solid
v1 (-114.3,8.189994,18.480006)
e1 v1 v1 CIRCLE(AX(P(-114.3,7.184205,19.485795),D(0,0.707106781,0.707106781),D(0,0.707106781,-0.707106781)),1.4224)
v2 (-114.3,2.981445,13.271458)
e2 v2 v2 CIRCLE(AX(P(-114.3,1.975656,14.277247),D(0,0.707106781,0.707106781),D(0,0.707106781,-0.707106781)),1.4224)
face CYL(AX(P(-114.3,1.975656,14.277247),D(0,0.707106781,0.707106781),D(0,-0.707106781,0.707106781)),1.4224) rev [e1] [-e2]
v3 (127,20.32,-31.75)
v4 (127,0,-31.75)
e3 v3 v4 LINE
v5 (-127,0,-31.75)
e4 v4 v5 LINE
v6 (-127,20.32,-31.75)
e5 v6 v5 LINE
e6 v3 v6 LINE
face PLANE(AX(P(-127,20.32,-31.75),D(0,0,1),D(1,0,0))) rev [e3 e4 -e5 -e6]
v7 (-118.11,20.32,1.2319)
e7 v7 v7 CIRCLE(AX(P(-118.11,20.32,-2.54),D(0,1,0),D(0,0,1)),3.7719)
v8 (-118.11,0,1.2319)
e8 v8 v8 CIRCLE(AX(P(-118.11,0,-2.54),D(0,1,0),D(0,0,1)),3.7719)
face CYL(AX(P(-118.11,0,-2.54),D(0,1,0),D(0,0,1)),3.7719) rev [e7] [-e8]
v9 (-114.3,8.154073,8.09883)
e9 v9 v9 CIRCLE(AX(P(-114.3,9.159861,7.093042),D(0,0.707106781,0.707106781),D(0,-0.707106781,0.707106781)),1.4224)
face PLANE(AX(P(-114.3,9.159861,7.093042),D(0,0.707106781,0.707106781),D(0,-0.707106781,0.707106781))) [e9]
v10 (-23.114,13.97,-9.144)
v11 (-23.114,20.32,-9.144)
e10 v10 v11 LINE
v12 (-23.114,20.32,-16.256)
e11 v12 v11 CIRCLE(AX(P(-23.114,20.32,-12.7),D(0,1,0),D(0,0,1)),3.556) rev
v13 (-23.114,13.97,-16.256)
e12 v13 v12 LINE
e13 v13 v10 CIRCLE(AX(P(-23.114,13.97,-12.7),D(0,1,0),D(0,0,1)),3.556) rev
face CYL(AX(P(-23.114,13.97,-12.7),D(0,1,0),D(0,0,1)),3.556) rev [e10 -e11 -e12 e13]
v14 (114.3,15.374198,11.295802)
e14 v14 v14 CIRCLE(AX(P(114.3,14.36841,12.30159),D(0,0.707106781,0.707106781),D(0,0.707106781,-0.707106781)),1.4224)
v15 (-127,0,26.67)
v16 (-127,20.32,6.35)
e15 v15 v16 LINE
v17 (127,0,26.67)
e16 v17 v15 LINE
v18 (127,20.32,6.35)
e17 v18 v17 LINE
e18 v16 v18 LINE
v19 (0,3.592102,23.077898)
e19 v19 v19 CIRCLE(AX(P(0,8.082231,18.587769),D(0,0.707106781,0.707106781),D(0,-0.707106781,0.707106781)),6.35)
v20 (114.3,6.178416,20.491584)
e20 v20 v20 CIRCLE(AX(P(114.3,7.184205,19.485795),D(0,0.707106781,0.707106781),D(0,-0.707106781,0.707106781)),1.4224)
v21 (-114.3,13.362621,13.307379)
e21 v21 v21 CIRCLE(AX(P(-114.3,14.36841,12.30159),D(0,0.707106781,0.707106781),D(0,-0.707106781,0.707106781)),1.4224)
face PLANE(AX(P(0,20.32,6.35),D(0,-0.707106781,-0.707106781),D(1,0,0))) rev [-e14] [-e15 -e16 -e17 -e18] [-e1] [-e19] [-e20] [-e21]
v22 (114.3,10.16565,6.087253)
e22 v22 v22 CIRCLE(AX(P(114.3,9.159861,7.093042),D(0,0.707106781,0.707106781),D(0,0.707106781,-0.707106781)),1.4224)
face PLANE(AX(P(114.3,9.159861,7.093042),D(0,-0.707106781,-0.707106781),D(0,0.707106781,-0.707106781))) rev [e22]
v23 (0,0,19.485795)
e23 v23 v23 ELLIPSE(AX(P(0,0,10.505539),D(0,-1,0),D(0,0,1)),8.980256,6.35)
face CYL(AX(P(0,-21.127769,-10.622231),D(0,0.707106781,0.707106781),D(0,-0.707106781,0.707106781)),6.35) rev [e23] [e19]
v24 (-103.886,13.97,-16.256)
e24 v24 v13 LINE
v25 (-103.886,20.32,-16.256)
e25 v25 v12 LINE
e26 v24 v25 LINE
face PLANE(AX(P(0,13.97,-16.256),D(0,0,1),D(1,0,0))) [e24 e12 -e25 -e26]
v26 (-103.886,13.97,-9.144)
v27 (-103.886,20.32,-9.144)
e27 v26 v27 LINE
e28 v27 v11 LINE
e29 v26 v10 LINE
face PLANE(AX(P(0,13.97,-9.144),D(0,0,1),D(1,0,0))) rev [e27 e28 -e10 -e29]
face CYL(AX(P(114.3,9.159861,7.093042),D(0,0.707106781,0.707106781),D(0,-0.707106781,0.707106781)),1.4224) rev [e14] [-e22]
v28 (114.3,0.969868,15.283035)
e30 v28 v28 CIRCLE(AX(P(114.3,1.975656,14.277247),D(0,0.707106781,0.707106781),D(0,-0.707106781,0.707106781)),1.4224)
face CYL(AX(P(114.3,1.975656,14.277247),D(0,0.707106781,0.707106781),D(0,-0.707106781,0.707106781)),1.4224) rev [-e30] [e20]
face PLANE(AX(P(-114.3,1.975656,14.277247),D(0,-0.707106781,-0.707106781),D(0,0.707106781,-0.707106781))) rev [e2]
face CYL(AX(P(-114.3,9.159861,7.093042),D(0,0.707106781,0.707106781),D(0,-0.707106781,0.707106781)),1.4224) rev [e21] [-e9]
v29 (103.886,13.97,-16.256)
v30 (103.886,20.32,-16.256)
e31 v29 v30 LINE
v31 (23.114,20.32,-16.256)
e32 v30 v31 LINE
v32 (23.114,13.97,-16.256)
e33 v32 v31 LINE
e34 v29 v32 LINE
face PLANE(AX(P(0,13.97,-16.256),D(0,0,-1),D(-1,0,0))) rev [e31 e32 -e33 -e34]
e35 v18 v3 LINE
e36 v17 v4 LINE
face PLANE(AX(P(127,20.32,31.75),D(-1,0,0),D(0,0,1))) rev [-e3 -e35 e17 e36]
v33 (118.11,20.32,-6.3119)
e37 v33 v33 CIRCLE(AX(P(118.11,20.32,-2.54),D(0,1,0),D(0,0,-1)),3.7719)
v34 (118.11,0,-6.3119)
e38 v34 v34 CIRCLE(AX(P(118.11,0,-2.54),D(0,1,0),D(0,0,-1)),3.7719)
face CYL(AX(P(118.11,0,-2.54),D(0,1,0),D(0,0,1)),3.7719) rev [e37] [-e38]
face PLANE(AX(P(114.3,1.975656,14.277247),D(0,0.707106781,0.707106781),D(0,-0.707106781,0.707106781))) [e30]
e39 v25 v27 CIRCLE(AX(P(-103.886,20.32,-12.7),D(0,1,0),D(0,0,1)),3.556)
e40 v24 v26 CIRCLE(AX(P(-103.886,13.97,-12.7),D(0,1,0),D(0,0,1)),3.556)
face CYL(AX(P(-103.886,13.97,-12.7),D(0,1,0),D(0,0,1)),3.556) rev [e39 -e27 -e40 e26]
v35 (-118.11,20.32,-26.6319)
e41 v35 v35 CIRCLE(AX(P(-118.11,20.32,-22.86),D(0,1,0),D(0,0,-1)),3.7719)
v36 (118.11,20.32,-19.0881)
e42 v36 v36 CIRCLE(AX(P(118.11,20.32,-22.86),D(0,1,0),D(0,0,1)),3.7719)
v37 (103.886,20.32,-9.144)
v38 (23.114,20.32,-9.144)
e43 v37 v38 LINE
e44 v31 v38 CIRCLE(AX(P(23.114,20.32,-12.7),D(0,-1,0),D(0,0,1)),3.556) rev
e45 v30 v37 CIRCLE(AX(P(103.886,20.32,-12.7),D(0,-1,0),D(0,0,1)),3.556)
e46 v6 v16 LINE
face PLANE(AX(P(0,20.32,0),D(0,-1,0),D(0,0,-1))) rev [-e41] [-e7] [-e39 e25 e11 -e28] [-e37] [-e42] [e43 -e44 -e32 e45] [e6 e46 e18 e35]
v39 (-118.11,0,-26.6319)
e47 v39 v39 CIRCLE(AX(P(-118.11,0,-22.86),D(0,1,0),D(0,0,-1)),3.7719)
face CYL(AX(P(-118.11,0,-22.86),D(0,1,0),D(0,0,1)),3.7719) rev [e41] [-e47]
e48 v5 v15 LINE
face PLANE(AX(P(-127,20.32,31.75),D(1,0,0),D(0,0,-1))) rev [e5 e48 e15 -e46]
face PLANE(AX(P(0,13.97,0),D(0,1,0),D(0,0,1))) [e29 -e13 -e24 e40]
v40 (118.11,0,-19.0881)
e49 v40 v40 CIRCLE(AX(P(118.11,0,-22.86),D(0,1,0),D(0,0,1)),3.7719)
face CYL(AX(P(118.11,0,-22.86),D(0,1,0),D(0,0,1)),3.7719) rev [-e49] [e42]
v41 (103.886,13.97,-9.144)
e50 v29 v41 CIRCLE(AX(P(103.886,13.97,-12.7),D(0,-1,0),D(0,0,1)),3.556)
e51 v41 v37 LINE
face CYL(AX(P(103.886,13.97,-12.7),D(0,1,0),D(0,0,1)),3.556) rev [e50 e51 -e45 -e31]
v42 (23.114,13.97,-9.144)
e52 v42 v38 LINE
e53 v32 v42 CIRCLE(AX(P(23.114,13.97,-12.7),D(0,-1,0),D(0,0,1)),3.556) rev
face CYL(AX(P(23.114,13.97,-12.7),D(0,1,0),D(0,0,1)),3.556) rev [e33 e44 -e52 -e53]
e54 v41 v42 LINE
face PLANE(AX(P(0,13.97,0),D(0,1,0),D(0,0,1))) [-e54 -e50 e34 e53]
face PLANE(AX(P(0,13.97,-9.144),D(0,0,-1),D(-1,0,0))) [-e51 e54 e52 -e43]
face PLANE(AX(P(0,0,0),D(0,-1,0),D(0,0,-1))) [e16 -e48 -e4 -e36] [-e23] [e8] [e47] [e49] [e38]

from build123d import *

# Parameters (mm, degrees)
SKETCH1_W           = 254
SKETCH1_H           = 63.5
BOSS_EXTRUDE1_DEPTH = 20.32
CHAMFER1_SIZE       = 25.4
CUT_EXTRUDE1_DEPTH  = 6.35
SKETCH3_R           = 3.7719
CUT_EXTRUDE2_DEPTH  = 133.476280518
SKETCH4_R           = 1.4224
CUT_EXTRUDE3_DEPTH  = 7.366
SKETCH5_R           = 6.35
CUT_EXTRUDE4_DEPTH  = 136.423334215


with BuildPart() as part:
    # Sketch1 → Boss-Extrude1 (new body)
    with BuildSketch(Plane(origin=(0, 0, 0), x_dir=(1, 0, 0), z_dir=(0, 1, 0))):
        Rectangle(SKETCH1_W, SKETCH1_H)
    extrude(amount=BOSS_EXTRUDE1_DEPTH)

    # Chamfer1
    # the kernel refuses this chamfer: 25.4 mm, written as the material it takes off along each edge
    with BuildSketch(Plane(origin=(-192.320747894, 20.32, 31.75), x_dir=(0, -0.9996219169112966, 0.02749587661058647), z_dir=(1, 0, 0))) as chamfer1_piece_1:
        Polygon((CHAMFER1_SIZE * 0.999621916911, CHAMFER1_SIZE * 0.0274958766106), (-CHAMFER1_SIZE * 0.0274958766106, CHAMFER1_SIZE * 0.999621916911), (0, 0), align=None)
    extrude(amount=384.641495789, mode=Mode.SUBTRACT)

    # Sketch2 → Cut-Extrude1 (cut)
    with BuildSketch(Plane(origin=(0, 20.32, 0), x_dir=(1, 0, 0), z_dir=(0, 1, 0))):
        with BuildLine():
            ThreePointArc((-107.442, 12.7), (-106.400471714, 10.185528286), (-103.886, 9.144))
            Line((-103.886, 9.144), (-23.114, 9.144))
            ThreePointArc((-23.114, 9.144), (-20.599528286, 10.185528286), (-19.558, 12.7))
            ThreePointArc((-19.558, 12.7), (-20.599528286, 15.214471714), (-23.114, 16.256))
            Line((-23.114, 16.256), (-103.886, 16.256))
            ThreePointArc((-103.886, 16.256), (-106.400471714, 15.214471714), (-107.442, 12.7))
        make_face()
    cut_extrude1 = extrude(amount=-CUT_EXTRUDE1_DEPTH, mode=Mode.SUBTRACT)

    # Sketch3 → Cut-Extrude2 (cut, through all)
    with BuildSketch(Plane(origin=(0, 20.32, 0), x_dir=(1, 0, 0), z_dir=(0, 1, 0))):
        with Locations(Location((-118.11, 2.54, 0), (0, 0, 270))):
            Circle(SKETCH3_R)
        with Locations(Location((-118.11, 22.86, 0), (0, 0, 90))):
            Circle(SKETCH3_R)
        with Locations(Location((118.11, 2.54, 0), (0, 0, 90))):
            Circle(SKETCH3_R)
        with Locations(Location((118.11, 22.86, 0), (0, 0, 270))):
            Circle(SKETCH3_R)
    extrude(amount=-CUT_EXTRUDE2_DEPTH, mode=Mode.SUBTRACT)

    # Mirror1: Cut-Extrude1 across plane
    add(cut_extrude1.mirror(Plane.ZY), mode=Mode.SUBTRACT)

    # Sketch4 → Cut-Extrude3 (cut)
    with BuildSketch(Plane(origin=(0, 13.335, 13.335), x_dir=(1, 0, 0), z_dir=(0, 0.7071067811865464, 0.7071067811865487))):
        with Locations(Location((-114.3, -8.698537854, 0), (0, 0, 90))):
            Circle(SKETCH4_R)
        with Locations(Location((-114.3, 1.461462146, 0), (0, 0, 270))):
            Circle(SKETCH4_R)
        with Locations(Location((114.3, -8.698537854, 0), (0, 0, 270))):
            Circle(SKETCH4_R)
        with Locations(Location((114.3, 1.461462146, 0), (0, 0, 90))):
            Circle(SKETCH4_R)
    extrude(amount=-CUT_EXTRUDE3_DEPTH, mode=Mode.SUBTRACT)

    # Sketch5 → Cut-Extrude4 (cut, through all)
    with BuildSketch(Plane(origin=(0, 13.335, 13.335), x_dir=(1, 0, 0), z_dir=(0, 0.7071067811865511, 0.707106781186544))):
        with Locations(Location((0, -7.428537854, 0), (0, 0, 270))):
            Circle(SKETCH5_R)
    extrude(amount=-CUT_EXTRUDE4_DEPTH, mode=Mode.SUBTRACT)


solid = part.part
